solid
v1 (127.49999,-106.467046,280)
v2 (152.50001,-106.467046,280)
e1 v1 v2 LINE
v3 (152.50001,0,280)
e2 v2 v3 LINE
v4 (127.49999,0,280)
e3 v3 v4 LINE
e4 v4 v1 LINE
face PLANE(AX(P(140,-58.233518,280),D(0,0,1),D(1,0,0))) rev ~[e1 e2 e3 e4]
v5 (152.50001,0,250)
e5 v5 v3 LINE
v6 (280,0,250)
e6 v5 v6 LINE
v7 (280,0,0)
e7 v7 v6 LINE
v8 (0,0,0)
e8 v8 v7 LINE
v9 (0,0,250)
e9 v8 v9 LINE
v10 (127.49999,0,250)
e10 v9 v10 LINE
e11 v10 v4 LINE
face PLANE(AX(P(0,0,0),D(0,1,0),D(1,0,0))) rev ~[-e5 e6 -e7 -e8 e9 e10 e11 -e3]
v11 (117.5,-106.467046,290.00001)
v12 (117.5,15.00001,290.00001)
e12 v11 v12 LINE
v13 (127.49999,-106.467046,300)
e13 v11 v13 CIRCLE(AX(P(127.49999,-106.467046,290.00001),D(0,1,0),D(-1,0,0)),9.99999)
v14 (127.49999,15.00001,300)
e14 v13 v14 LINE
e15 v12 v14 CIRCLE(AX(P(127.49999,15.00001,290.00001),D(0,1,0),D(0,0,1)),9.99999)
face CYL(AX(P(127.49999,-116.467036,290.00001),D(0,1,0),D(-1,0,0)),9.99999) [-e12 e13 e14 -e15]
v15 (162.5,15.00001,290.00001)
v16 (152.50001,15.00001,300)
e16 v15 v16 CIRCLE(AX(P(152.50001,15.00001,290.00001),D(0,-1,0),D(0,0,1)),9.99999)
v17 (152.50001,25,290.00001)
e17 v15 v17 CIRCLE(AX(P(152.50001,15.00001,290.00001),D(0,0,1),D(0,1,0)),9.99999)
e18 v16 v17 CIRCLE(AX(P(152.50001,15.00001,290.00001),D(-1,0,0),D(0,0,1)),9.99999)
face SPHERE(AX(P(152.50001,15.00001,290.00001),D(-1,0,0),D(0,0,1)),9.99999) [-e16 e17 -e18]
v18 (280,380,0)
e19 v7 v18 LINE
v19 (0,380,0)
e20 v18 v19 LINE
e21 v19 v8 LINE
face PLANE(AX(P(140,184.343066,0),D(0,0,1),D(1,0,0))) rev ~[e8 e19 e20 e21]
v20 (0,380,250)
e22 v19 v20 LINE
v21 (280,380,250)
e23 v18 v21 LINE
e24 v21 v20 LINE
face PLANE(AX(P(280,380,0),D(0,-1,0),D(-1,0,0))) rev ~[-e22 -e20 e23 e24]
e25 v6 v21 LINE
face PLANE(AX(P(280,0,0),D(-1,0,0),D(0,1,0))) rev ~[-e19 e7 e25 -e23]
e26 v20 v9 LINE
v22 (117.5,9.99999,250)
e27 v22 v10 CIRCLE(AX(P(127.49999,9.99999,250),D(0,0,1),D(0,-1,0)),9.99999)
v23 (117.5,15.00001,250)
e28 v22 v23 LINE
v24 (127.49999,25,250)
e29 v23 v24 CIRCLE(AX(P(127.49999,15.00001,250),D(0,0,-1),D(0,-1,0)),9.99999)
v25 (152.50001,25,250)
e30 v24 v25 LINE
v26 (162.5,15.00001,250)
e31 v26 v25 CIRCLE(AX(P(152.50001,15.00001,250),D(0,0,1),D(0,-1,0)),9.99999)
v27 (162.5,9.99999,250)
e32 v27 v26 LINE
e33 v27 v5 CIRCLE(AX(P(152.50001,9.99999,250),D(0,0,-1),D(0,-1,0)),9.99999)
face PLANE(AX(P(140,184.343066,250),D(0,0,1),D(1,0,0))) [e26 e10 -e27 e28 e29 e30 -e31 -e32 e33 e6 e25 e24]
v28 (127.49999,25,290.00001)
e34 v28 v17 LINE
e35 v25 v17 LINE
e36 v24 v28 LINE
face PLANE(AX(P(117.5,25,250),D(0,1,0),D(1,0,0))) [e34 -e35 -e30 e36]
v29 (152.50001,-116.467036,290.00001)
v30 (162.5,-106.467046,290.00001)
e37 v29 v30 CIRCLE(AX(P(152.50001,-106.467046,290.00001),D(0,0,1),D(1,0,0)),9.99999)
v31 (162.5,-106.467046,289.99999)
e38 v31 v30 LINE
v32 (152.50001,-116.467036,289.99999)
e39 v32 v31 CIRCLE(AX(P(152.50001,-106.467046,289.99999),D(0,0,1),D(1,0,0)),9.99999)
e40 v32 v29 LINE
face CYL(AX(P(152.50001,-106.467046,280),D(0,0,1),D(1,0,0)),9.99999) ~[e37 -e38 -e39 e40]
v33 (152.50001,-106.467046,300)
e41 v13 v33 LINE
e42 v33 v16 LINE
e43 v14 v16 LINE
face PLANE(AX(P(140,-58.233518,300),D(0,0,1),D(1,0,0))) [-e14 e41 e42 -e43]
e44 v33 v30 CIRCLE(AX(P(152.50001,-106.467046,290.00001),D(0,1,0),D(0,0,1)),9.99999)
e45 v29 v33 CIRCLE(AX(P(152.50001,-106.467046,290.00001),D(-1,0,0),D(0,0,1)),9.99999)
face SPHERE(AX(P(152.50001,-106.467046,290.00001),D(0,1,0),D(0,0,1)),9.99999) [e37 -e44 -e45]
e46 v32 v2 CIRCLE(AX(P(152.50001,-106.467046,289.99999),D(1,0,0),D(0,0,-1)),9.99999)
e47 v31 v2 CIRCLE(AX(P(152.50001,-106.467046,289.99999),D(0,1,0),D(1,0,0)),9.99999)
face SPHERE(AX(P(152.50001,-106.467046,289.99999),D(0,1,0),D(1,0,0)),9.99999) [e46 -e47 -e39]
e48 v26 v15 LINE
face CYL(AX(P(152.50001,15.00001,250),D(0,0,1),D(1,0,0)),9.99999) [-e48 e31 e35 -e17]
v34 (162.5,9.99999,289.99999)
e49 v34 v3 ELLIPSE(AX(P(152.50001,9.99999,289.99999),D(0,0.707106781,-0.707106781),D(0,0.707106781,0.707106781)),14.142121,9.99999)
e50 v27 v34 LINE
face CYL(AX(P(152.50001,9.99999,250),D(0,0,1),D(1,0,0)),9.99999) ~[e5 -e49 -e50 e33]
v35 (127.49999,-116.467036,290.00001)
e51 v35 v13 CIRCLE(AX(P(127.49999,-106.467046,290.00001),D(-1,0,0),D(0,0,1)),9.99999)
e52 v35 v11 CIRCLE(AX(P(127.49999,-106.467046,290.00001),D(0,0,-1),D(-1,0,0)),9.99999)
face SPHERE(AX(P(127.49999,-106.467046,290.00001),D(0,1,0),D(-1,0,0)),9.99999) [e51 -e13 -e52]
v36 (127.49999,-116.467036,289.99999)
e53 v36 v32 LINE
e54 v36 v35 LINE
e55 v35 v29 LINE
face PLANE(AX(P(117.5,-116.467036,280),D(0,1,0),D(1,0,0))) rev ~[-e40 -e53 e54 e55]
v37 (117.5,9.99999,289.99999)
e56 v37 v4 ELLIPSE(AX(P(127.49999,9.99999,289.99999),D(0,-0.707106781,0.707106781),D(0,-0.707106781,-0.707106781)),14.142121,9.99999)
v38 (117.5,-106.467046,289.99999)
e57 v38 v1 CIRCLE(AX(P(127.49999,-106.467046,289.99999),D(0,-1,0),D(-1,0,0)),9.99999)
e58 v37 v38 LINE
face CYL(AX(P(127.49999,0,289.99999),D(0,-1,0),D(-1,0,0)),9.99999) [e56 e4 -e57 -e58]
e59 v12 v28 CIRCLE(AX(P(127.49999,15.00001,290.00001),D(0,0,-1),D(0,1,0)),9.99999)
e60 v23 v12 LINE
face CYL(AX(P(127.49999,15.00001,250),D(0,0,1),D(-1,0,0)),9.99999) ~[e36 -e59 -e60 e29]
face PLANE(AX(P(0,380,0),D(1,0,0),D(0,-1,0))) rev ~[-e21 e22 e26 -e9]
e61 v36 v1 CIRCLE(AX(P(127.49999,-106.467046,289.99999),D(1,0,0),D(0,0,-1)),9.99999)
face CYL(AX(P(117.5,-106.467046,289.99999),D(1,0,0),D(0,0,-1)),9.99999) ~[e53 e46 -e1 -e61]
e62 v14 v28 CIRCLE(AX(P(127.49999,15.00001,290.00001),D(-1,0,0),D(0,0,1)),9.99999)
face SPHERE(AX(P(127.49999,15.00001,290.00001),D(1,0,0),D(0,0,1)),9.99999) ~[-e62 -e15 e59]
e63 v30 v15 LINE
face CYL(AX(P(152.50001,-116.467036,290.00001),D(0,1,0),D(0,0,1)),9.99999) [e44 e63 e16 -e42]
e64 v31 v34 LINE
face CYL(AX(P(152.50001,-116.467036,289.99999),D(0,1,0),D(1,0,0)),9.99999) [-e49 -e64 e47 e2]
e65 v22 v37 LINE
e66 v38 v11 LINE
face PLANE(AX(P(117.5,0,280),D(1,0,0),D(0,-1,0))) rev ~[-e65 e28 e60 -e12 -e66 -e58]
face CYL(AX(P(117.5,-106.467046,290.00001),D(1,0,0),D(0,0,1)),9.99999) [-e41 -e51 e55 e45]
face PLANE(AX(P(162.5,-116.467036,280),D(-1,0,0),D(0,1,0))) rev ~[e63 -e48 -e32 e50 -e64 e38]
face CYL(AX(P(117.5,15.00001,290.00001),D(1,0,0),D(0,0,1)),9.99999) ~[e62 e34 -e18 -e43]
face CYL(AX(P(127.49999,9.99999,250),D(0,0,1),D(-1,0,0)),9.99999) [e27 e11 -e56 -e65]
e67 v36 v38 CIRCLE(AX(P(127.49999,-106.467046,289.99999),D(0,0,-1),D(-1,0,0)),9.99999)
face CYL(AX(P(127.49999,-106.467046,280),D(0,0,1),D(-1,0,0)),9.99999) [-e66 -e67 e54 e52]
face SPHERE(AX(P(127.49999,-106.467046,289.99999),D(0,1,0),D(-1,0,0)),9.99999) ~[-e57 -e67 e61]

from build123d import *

# Parameters (mm, degrees)
F0_W     = 45
F0_H     = 25
F1_DEPTH = 250
F2_START = 250
F2_DEPTH = 50
F3_START = 280
F3_DEPTH = 20
F4_R     = 9.99999


# Not quite as in the source:
# - a fillet or chamfer is up to 0.001 mm smaller than in the source, because OpenCascade refuses the exact size


with BuildPart() as f1:
    # F0 (on Top) → F1 (new body)
    with BuildSketch(Plane.XY):
        Polygon((0, 380), (0, 0), (117.5, 0), (117.5, 25), (162.5, 25), (162.5, 0), (280, 0), (280, 380), align=None)
        with Locations((140, 12.5)):
            Rectangle(F0_W, F0_H)
    extrude(amount=F1_DEPTH)

    # F0 (on Top) → F2 (join)
    with BuildSketch(Plane.XY.offset(F2_START)):
        with Locations((140, 12.5)):
            Rectangle(F0_W, F0_H)
    extrude(amount=F2_DEPTH)

    # F0 (on Top) → F3 (join)
    with BuildSketch(Plane.XY.offset(F3_START)):
        Polygon((162.5, 0), (117.5, 0), (117.5, -116.4670363069), (140, -116.4670363069), (162.5, -116.4670363069), align=None)
    extrude(amount=F3_DEPTH)

    # F4 (radius 10 in the source; OpenCascade refuses exactly that, so slightly less here)
    f4_edges = [f1.edges().sort_by_distance(p)[0] for p in [
        (140, 25, 300),
        (117.5, -45.733518, 300),
        (162.5, -45.733518, 300),
        (162.5, 25, 275),
        (117.5, 25, 275),
        (162.5, -58.233518, 280),
        (117.5, -58.233518, 280),
        (162.5, 0, 265),
        (117.5, 0, 265),
        (117.5, -116.467036, 290),
        (140, -116.467036, 300),
        (162.5, -116.467036, 290),
        (140, -116.467036, 280),
    ]]
    fillet(f4_edges, radius=F4_R)


solid = f1.part
